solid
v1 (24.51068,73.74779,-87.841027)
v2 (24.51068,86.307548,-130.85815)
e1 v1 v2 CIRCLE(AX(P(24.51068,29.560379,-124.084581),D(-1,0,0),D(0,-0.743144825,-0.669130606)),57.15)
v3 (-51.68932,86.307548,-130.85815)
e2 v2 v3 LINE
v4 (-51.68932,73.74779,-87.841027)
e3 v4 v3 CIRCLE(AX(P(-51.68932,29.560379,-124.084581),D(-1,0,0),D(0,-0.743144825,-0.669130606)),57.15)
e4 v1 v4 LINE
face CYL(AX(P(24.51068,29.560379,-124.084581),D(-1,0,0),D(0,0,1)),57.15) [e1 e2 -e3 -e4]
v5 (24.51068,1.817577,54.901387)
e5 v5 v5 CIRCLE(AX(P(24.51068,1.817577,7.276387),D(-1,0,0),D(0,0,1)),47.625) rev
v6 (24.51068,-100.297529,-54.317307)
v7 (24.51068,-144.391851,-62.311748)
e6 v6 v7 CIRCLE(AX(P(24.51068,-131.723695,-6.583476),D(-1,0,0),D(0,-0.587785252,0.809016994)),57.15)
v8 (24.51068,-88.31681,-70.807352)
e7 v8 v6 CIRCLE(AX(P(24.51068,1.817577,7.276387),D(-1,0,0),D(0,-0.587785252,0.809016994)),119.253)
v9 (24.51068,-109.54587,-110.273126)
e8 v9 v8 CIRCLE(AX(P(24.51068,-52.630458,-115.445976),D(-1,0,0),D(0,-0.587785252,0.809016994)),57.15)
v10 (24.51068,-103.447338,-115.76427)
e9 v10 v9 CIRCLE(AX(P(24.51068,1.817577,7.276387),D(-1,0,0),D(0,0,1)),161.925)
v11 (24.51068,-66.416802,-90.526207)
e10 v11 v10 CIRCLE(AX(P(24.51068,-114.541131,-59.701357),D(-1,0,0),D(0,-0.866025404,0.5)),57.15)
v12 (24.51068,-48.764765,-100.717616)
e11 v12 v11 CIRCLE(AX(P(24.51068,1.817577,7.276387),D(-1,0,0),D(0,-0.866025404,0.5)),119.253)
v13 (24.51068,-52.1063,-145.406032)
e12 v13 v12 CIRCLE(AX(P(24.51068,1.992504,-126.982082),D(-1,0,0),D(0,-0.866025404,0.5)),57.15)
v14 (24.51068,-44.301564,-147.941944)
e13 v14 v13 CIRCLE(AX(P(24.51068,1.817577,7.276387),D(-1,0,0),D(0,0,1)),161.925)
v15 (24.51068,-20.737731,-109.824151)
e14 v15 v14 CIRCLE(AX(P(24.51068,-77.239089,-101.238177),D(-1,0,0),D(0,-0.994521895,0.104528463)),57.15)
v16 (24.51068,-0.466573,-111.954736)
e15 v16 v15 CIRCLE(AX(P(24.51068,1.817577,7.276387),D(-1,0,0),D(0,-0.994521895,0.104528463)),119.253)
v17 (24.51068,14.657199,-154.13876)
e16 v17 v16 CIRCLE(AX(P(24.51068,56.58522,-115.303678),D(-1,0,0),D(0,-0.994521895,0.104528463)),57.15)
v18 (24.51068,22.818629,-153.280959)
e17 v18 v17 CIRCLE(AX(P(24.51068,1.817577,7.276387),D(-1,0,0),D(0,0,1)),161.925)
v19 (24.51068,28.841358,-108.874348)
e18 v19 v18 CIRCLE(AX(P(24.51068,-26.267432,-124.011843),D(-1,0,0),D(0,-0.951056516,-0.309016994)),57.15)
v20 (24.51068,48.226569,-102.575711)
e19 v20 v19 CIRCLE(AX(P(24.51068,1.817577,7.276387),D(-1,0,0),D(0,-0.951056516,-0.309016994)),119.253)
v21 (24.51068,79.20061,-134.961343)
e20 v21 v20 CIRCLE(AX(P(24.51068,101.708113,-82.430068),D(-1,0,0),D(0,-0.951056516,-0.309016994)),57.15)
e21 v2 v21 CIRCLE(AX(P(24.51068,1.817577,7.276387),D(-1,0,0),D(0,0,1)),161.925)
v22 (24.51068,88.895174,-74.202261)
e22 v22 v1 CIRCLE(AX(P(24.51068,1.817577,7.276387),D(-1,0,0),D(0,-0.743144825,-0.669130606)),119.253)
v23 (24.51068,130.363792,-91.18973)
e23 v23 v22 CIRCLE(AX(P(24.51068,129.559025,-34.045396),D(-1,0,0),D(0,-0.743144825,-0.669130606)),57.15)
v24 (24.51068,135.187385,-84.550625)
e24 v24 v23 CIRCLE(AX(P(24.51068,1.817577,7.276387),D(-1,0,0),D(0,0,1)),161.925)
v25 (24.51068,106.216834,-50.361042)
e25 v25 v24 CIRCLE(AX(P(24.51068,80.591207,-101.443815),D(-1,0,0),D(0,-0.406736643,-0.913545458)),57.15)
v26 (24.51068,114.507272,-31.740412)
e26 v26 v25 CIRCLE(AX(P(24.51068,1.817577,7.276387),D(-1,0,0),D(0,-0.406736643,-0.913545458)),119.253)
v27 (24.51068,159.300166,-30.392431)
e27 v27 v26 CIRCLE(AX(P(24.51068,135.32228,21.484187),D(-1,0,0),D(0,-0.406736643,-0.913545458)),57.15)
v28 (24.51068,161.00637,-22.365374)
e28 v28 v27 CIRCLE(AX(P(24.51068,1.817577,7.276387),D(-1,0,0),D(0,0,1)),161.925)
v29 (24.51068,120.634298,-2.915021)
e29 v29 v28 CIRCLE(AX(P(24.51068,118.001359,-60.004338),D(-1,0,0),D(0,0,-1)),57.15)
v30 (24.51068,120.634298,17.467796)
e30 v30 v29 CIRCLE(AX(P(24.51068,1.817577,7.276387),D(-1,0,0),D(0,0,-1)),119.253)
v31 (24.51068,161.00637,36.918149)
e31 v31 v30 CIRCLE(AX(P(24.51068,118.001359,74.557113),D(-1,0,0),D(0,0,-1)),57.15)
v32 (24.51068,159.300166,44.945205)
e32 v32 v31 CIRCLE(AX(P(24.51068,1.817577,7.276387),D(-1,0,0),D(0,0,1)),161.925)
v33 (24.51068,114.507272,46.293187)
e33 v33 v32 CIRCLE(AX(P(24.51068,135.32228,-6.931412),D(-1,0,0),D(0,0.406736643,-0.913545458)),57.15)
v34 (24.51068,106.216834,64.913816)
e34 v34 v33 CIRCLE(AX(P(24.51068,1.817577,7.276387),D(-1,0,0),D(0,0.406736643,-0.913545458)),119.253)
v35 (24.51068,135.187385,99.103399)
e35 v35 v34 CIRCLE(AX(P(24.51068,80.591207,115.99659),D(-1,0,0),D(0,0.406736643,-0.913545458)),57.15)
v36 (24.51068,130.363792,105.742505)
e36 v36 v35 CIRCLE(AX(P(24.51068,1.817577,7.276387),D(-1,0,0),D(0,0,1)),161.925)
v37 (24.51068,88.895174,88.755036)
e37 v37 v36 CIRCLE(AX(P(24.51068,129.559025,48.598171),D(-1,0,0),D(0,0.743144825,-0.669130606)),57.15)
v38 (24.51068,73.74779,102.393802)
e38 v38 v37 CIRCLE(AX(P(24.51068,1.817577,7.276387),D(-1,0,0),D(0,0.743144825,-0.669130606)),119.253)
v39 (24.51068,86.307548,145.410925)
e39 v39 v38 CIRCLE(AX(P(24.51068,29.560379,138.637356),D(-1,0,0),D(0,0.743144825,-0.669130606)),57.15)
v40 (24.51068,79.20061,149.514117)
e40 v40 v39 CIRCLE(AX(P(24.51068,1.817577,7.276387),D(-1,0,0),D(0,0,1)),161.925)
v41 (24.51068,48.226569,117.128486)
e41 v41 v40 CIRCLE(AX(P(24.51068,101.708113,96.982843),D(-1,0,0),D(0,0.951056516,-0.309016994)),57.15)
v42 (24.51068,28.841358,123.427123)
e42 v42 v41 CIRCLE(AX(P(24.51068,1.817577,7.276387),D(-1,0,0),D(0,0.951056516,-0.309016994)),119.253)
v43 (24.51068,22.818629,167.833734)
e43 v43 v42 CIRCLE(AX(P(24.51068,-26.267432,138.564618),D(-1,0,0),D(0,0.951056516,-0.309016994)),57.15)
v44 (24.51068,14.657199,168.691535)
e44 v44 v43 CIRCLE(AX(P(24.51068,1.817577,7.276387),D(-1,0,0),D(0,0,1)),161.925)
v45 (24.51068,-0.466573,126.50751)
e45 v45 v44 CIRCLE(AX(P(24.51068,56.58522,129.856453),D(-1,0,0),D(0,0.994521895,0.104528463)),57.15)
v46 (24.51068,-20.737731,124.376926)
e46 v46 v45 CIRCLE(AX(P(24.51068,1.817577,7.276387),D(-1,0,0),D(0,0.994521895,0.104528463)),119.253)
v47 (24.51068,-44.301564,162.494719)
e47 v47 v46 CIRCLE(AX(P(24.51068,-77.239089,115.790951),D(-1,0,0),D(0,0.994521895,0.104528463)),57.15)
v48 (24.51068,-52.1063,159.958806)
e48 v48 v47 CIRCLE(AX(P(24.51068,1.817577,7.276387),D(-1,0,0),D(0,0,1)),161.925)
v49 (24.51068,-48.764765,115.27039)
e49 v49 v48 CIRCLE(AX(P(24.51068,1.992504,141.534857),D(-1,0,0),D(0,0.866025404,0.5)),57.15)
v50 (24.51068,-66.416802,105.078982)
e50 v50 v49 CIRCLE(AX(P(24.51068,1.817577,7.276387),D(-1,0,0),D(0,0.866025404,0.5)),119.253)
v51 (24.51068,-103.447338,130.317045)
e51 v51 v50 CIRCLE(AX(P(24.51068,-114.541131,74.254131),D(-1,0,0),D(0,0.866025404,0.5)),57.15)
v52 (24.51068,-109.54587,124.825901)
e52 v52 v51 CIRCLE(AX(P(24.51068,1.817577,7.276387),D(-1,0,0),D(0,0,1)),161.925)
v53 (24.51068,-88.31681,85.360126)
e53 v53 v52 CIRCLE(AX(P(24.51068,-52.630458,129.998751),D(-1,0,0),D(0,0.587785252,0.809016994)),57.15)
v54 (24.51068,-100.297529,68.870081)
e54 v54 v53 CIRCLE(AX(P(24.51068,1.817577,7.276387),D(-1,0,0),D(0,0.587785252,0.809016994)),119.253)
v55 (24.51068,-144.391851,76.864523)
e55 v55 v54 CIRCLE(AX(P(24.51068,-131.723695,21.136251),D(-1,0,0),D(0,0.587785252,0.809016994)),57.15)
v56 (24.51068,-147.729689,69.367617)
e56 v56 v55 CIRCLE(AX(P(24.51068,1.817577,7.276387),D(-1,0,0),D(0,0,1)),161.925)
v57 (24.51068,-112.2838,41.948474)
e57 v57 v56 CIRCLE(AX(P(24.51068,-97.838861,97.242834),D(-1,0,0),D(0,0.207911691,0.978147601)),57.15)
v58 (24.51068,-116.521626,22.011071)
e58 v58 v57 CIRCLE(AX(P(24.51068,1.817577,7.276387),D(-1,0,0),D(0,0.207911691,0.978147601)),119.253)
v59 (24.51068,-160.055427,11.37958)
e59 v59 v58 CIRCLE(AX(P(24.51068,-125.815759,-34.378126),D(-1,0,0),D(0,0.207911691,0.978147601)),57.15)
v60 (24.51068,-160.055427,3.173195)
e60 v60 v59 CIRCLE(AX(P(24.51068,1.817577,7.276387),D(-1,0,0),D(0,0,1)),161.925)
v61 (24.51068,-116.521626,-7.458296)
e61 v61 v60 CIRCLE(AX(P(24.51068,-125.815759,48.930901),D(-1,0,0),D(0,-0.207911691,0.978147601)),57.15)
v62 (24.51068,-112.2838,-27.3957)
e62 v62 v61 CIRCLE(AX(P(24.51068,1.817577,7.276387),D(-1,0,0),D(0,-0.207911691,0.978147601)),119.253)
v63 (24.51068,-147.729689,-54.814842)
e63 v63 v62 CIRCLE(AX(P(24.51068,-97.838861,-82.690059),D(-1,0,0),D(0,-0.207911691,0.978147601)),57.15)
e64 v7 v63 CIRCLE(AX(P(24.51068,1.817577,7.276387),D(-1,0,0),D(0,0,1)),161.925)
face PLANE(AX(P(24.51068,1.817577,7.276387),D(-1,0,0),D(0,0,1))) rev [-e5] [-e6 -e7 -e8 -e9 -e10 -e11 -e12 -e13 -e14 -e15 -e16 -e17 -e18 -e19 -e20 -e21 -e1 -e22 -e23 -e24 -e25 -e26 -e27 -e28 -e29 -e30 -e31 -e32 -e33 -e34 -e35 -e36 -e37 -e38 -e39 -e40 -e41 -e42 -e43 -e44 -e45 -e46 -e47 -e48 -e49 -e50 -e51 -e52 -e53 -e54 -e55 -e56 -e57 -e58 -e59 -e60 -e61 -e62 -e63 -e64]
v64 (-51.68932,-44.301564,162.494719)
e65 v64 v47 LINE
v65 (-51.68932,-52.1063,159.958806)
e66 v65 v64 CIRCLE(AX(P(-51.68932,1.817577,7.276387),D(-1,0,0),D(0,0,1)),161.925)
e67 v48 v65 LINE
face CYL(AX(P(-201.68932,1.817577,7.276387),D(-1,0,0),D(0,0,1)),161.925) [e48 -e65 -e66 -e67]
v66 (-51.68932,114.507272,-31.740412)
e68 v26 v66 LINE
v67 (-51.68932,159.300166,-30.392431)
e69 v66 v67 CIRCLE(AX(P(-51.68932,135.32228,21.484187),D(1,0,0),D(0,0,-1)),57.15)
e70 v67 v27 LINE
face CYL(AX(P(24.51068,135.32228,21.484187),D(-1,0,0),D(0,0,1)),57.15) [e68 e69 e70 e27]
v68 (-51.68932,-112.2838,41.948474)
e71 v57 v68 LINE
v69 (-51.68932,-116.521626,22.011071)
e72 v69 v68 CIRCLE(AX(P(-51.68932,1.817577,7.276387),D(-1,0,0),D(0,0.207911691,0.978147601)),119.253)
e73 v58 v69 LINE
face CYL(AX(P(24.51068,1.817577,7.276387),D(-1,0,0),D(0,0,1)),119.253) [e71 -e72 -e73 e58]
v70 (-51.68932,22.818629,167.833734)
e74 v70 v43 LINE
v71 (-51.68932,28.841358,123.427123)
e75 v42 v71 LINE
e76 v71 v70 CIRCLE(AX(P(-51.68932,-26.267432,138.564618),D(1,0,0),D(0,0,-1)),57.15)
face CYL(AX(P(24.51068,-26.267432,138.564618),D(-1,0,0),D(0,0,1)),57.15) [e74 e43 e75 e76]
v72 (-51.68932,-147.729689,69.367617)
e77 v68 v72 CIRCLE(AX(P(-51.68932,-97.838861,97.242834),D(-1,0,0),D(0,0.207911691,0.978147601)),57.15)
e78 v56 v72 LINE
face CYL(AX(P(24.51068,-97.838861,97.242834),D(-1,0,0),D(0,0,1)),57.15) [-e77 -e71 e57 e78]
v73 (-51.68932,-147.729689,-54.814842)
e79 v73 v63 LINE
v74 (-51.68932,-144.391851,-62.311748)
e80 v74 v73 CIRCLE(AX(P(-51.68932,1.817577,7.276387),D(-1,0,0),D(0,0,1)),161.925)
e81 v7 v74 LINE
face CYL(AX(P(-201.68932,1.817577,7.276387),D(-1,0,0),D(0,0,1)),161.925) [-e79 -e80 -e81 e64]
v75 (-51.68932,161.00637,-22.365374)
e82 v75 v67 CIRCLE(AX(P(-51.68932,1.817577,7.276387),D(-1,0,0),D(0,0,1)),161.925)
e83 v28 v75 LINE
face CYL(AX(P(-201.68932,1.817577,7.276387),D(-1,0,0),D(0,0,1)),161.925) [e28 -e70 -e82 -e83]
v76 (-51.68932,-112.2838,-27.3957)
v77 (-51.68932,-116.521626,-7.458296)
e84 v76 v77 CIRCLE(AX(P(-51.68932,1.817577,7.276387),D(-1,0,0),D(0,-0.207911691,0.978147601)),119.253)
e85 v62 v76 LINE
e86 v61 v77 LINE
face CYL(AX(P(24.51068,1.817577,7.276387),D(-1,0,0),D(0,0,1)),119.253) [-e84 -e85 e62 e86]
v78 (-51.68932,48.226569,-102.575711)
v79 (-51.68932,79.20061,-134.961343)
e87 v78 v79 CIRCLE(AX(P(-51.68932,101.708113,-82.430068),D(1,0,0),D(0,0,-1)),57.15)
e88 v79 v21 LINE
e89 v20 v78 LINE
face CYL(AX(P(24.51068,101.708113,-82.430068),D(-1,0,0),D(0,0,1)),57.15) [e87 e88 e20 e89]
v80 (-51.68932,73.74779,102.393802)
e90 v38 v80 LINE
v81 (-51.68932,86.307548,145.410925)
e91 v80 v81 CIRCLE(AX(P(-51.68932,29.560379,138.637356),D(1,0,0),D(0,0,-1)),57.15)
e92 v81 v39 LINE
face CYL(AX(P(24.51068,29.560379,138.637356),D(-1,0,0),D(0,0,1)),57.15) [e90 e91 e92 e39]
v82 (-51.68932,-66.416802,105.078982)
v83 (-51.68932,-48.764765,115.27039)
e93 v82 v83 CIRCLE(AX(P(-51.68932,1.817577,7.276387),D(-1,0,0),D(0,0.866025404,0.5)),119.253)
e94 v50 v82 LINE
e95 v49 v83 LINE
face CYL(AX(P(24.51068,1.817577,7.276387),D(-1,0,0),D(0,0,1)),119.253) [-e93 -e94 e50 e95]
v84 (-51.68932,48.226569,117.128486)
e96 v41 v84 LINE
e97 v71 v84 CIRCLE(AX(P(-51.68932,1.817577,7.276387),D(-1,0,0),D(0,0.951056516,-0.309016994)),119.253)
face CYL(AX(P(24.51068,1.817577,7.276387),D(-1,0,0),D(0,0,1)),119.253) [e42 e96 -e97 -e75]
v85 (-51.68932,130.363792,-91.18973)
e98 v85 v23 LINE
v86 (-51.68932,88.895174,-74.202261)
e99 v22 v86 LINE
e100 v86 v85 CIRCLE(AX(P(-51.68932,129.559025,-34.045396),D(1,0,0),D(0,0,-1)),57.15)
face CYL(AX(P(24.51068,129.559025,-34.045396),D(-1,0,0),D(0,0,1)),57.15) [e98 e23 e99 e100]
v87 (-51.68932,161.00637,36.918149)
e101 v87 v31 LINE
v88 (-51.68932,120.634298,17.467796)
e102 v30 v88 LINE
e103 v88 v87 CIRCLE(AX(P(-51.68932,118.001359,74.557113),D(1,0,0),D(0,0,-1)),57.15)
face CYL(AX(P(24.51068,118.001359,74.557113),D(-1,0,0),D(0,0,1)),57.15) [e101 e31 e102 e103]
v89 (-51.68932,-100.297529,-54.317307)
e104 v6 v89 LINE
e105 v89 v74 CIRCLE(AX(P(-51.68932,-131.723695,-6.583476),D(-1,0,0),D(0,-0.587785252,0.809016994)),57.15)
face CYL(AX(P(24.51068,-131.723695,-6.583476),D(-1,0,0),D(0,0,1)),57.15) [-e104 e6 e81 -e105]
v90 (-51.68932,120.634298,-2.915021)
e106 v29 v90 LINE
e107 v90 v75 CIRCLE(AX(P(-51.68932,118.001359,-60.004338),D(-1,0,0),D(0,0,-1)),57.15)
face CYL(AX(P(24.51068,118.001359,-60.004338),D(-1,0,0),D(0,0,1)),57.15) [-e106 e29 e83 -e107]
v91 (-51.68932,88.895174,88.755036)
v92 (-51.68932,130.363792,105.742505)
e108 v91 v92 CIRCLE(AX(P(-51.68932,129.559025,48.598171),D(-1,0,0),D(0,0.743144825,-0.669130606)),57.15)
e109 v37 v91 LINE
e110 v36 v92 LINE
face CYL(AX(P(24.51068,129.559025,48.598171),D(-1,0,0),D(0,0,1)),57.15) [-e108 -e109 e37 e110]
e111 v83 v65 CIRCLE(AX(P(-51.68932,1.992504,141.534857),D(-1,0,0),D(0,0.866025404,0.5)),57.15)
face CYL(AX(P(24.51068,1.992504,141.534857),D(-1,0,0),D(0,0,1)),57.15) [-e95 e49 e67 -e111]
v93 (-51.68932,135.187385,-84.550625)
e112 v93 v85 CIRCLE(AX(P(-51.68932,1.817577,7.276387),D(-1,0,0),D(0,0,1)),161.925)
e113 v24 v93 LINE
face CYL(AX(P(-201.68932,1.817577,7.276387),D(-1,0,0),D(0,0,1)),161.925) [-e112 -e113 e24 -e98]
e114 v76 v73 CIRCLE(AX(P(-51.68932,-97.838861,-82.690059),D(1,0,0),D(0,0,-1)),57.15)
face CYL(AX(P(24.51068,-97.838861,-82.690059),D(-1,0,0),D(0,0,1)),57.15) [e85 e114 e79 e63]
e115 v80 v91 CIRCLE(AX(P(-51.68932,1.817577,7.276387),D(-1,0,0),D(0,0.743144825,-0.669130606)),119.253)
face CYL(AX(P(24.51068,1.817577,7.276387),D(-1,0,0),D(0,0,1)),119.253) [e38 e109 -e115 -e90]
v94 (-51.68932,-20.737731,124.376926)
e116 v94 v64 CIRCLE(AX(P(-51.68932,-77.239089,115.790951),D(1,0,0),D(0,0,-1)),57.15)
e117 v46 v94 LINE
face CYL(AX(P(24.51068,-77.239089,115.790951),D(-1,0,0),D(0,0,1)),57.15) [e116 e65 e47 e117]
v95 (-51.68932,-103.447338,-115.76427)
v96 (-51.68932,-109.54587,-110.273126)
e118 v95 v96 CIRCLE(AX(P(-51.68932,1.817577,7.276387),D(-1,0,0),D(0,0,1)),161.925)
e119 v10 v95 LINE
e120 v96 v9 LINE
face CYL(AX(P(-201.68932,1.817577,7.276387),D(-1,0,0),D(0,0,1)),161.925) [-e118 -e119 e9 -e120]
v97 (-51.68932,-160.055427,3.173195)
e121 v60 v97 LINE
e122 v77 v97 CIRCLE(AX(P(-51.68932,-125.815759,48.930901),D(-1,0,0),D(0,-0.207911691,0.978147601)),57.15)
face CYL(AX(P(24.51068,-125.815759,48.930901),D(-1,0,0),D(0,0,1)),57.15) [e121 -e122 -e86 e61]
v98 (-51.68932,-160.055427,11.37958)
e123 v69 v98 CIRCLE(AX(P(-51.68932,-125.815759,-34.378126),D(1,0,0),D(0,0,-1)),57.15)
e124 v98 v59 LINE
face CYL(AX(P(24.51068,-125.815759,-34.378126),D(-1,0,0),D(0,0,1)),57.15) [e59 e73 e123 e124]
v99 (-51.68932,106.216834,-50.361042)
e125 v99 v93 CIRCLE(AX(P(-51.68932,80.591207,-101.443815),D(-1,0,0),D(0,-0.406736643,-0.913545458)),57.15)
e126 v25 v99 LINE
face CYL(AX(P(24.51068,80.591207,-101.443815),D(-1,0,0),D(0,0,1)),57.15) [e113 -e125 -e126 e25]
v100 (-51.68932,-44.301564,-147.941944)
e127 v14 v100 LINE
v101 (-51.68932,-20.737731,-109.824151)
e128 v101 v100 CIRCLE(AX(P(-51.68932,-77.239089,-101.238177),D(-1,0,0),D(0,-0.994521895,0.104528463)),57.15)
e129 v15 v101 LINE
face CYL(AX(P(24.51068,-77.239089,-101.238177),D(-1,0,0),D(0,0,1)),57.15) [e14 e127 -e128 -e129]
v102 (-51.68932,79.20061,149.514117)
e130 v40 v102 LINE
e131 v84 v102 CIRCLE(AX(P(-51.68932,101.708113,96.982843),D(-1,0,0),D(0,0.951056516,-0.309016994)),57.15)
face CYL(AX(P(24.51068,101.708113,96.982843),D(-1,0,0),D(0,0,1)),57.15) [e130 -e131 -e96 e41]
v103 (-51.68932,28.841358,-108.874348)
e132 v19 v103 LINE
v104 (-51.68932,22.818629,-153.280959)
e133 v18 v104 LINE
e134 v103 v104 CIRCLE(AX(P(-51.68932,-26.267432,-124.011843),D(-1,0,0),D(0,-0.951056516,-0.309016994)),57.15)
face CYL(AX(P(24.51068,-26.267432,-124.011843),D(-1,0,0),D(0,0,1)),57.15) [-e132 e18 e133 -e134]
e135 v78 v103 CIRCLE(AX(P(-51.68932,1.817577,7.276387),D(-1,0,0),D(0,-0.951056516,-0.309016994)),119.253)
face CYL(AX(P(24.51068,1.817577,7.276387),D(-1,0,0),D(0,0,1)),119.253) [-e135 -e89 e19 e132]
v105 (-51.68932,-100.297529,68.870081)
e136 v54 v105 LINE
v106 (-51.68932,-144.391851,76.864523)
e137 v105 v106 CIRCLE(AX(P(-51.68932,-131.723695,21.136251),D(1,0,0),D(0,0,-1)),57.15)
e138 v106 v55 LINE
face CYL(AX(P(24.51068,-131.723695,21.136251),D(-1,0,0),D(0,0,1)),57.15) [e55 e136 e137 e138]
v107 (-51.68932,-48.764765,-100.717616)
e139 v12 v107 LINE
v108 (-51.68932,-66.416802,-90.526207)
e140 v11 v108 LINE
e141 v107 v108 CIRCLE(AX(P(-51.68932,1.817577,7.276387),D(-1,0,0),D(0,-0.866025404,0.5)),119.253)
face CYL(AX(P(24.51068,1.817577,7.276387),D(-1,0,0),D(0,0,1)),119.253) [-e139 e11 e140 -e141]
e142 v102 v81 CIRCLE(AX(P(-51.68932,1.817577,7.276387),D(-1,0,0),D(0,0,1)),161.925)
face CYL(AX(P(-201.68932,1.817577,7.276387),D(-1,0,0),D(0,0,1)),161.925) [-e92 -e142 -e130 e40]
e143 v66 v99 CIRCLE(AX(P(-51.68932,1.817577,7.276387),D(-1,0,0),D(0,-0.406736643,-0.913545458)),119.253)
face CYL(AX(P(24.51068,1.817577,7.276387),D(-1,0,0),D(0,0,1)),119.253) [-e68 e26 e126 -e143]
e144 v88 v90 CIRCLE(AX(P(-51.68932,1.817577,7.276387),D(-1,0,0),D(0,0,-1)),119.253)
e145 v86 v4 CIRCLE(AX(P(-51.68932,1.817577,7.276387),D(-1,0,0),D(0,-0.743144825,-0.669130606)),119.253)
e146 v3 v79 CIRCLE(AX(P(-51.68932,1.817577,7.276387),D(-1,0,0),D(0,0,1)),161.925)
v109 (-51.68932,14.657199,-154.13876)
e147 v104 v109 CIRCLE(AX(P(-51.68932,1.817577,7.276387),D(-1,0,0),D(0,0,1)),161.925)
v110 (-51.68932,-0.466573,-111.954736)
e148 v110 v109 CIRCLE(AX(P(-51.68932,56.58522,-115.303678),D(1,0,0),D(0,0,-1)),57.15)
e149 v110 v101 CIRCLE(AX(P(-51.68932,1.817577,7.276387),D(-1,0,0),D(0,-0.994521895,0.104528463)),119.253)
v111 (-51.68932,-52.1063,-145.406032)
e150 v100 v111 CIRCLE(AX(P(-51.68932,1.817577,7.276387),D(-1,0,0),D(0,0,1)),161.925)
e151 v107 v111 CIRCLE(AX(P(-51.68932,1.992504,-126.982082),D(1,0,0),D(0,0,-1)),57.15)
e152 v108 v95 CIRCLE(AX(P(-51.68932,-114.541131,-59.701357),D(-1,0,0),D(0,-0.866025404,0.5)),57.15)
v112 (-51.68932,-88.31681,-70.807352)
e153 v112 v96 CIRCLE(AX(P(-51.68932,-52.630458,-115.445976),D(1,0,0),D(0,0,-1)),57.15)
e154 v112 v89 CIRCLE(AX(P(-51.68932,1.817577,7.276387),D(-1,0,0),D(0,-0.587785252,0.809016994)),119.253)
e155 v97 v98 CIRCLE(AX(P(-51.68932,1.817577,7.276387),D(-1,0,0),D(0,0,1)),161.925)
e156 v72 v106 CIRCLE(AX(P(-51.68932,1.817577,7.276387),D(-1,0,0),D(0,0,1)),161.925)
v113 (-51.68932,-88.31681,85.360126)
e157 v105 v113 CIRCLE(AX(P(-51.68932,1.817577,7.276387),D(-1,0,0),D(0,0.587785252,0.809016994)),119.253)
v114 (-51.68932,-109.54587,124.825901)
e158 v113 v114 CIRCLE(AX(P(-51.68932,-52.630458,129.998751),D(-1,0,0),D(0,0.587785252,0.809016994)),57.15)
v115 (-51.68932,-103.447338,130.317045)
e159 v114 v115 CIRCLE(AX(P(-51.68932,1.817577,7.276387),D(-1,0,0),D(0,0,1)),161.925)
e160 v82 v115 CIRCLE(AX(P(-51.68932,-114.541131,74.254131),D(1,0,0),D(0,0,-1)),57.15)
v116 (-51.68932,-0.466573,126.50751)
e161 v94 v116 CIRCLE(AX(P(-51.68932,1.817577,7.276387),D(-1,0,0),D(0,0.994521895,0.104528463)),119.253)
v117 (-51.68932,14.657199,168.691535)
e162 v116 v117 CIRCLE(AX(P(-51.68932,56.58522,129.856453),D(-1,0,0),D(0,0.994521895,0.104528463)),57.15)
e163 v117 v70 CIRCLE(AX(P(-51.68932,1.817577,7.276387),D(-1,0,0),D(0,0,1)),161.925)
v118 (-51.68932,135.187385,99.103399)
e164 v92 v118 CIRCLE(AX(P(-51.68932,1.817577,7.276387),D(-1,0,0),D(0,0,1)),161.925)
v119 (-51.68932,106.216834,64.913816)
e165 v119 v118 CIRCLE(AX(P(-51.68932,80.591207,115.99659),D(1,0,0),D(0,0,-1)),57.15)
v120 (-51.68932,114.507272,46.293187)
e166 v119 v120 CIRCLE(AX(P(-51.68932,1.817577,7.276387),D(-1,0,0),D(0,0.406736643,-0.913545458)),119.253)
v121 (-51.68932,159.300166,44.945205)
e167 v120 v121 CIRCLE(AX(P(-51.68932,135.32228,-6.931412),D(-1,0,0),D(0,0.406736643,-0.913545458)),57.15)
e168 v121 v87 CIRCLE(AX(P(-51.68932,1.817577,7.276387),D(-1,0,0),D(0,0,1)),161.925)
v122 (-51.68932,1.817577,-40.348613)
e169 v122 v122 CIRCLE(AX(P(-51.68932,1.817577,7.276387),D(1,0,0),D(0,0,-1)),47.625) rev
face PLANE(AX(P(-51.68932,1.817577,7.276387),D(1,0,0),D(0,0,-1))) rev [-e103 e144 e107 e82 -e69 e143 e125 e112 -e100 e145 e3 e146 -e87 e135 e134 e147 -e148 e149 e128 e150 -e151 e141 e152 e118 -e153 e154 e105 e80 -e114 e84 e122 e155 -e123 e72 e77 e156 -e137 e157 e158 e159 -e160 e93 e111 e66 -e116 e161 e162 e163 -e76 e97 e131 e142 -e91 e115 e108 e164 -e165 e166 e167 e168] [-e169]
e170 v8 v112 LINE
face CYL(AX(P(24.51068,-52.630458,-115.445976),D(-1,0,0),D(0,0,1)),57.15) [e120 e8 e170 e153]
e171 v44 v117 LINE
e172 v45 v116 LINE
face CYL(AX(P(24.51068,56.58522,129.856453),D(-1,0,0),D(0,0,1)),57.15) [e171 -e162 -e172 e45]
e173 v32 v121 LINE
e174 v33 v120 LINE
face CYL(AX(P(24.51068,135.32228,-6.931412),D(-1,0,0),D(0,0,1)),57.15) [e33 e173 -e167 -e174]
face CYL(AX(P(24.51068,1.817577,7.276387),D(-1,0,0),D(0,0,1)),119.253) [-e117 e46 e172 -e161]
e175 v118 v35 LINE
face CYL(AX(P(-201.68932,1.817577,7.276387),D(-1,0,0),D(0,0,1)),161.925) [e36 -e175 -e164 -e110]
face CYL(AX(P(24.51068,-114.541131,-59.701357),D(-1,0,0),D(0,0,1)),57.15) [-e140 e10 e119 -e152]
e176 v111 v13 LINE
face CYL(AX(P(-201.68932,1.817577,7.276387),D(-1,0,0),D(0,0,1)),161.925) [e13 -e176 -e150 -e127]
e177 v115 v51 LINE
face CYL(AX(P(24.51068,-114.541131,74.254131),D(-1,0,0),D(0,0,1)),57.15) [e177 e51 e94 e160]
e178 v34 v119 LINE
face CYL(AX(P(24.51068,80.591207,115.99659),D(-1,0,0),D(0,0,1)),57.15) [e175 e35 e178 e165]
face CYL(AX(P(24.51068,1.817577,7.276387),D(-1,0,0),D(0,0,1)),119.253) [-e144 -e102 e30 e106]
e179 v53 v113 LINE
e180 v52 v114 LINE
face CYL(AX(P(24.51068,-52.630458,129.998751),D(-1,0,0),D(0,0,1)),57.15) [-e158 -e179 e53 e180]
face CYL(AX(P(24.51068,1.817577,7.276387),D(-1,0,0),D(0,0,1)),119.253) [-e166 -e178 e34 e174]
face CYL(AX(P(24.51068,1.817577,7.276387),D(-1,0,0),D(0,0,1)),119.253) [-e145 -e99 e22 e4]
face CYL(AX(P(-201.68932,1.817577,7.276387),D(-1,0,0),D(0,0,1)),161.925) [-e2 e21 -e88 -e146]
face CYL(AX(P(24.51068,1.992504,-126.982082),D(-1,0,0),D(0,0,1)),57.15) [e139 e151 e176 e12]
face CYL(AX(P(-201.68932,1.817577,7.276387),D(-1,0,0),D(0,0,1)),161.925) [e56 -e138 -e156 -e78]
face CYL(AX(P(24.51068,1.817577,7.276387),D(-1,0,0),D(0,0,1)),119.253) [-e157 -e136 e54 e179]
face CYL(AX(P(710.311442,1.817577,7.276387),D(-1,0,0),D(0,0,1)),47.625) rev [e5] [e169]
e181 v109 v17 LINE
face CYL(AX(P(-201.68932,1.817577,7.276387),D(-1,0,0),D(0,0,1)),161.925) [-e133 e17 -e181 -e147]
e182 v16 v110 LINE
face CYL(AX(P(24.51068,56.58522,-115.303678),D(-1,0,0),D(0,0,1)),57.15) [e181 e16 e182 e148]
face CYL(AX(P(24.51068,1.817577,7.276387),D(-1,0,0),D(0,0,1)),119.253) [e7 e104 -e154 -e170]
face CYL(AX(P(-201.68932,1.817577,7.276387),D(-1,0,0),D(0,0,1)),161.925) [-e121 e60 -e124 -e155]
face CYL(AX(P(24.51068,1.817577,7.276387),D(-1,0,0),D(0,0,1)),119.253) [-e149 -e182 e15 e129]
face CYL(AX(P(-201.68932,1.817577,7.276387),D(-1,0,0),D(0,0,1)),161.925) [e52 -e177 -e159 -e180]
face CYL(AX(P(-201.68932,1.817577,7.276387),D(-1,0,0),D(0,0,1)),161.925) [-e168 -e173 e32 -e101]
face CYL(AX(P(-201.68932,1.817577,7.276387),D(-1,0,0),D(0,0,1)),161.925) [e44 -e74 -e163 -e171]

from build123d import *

# Parameters (mm, degrees)
SPUR_START             = -16.129320455
SPUR_GEAR_AI_OUTLINE_R = 3.175
SPUR_GEAR_AI_DEPTH     = 5.08
SCALE1_SCALE           = 15


# Read off the part's stored shape, not the designer's step: spur gear_ai
with BuildPart() as part:
    # spur gear_ai outline → spur gear_ai (new body)
    with BuildSketch(Plane.YZ.offset(SPUR_START)):
        with BuildLine():
            ThreePointArc((3.217647432, 17.980210444), (2.945962103, 18.012251215), (2.673552099, 18.037397168))
            ThreePointArc((2.673552099, 18.037397168), (1.882282705, 16.734209467), (1.665300635, 15.22512888))
            ThreePointArc((1.665300635, 15.22512888), (0.986555153, 15.183035327), (0.313890146, 15.083089914))
            ThreePointArc((0.313890146, 15.083089914), (-0.212105842, 16.514080361), (-1.257032059, 17.624276126))
            ThreePointArc((-1.257032059, 17.624276126), (-1.518261113, 17.543042448), (-1.777347815, 17.455215289))
            ThreePointArc((-1.777347815, 17.455215289), (-1.970154185, 15.942855827), (-1.554578797, 14.475987553))
            ThreePointArc((-1.554578797, 14.475987553), (-2.157522658, 14.161462519), (-2.731381258, 13.796560335))
            ThreePointArc((-2.731381258, 13.796560335), (-3.793938754, 14.889893315), (-5.200083652, 15.479097832))
            ThreePointArc((-5.200083652, 15.479097832), (-5.405687554, 15.298635745), (-5.60665251, 15.113021587))
            ThreePointArc((-5.60665251, 15.113021587), (-5.167657883, 13.652991056), (-4.191381798, 12.481969945))
            ThreePointArc((-4.191381798, 12.481969945), (-4.614269567, 11.949397667), (-4.990096395, 11.382633613))
            ThreePointArc((-4.990096395, 11.382633613), (-6.405489555, 11.949261922), (-7.929717906, 11.915596376))
            ThreePointArc((-7.929717906, 11.915596376), (-8.044145874, 11.667109416), (-8.152240417, 11.415802634))
            ThreePointArc((-8.152240417, 11.415802634), (-7.157350952, 10.260553574), (-5.789181173, 9.587859815))
            ThreePointArc((-5.789181173, 9.587859815), (-5.958891714, 8.929326879), (-6.071702896, 8.25869961))
            ThreePointArc((-6.071702896, 8.25869961), (-7.595197385, 8.200648065), (-8.973956261, 7.549933535))
            ThreePointArc((-8.973956261, 7.549933535), (-8.977422659, 7.276387354), (-8.973956261, 7.002841173))
            ThreePointArc((-8.973956261, 7.002841173), (-7.595197384, 6.352126644), (-6.071702896, 6.294075099))
            ThreePointArc((-6.071702896, 6.294075099), (-5.958891714, 5.62344783), (-5.789181173, 4.964914893))
            ThreePointArc((-5.789181173, 4.964914893), (-7.157350952, 4.292221134), (-8.152240417, 3.136972074))
            ThreePointArc((-8.152240417, 3.136972074), (-8.044145874, 2.885665292), (-7.929717906, 2.637178332))
            ThreePointArc((-7.929717906, 2.637178332), (-6.405489555, 2.603512786), (-4.990096395, 3.170141095))
            ThreePointArc((-4.990096395, 3.170141095), (-4.614269567, 2.603377042), (-4.191381798, 2.070804764))
            ThreePointArc((-4.191381798, 2.070804764), (-5.167657883, 0.899783653), (-5.60665251, -0.560246879))
            ThreePointArc((-5.60665251, -0.560246879), (-5.405687554, -0.745861037), (-5.200083652, -0.926323123))
            ThreePointArc((-5.200083652, -0.926323123), (-3.793938754, -0.337118607), (-2.731381258, 0.756214373))
            ThreePointArc((-2.731381258, 0.756214373), (-2.157522658, 0.391312189), (-1.554578797, 0.076787156))
            ThreePointArc((-1.554578797, 0.076787156), (-1.970154185, -1.390081118), (-1.777347815, -2.90244058))
            ThreePointArc((-1.777347815, -2.90244058), (-1.518261113, -2.990267739), (-1.257032059, -3.071501418))
            ThreePointArc((-1.257032059, -3.071501418), (-0.212105842, -1.961305652), (0.313890146, -0.530315206))
            ThreePointArc((0.313890146, -0.530315206), (0.986555153, -0.630260618), (1.665300635, -0.672354172))
            ThreePointArc((1.665300635, -0.672354172), (1.882282705, -2.181434759), (2.673552099, -3.48462246))
            ThreePointArc((2.673552099, -3.48462246), (2.945962103, -3.459476506), (3.217647432, -3.427435736))
            ThreePointArc((3.217647432, -3.427435736), (3.720677732, -1.988211655), (3.619162727, -0.466994991))
            ThreePointArc((3.619162727, -0.466994991), (4.27432425, -0.284702162), (4.911510093, -0.047085877))
            ThreePointArc((4.911510093, -0.047085877), (5.723531449, -1.337445034), (6.976446201, -2.206127982))
            ThreePointArc((6.976446201, -2.206127982), (7.215077342, -2.07235688), (7.450242085, -1.932581801))
            ThreePointArc((7.450242085, -1.932581801), (7.324397959, -0.413184324), (6.612924828, 0.935226378))
            ThreePointArc((6.612924828, 0.935226378), (7.137299488, 1.368237363), (7.62275047, 1.844477471))
            ThreePointArc((7.62275047, 1.844477471), (8.889405244, 0.995954565), (10.38732501, 0.711979544))
            ThreePointArc((10.38732501, 0.711979544), (10.550915796, 0.931245556), (10.708897832, 1.154586562))
            ThreePointArc((10.708897832, 1.154586562), (9.975938874, 2.491439809), (8.777527784, 3.433892087))
            ThreePointArc((8.777527784, 3.433892087), (9.080446439, 4.042749694), (9.330223676, 4.675267385))
            ThreePointArc((9.330223676, 4.675267385), (10.832495749, 4.415298049), (12.316416594, 4.765132816))
            ThreePointArc((12.316416594, 4.765132816), (12.376680691, 5.031980652), (12.430163492, 5.300269897))
            ThreePointArc((12.430163492, 5.300269897), (11.216824963, 6.223424842), (9.73869208, 6.596960136))
            ThreePointArc((9.73869208, 6.596960136), (9.767777341, 7.276387354), (9.73869208, 7.955814572))
            ThreePointArc((9.73869208, 7.955814572), (11.216824963, 8.329349866), (12.430163492, 9.252504811))
            ThreePointArc((12.430163492, 9.252504811), (12.376680691, 9.520794056), (12.316416594, 9.787641893))
            ThreePointArc((12.316416594, 9.787641893), (10.832495749, 10.137476659), (9.330223676, 9.877507324))
            ThreePointArc((9.330223676, 9.877507324), (9.080446439, 10.510025014), (8.777527784, 11.118882621))
            ThreePointArc((8.777527784, 11.118882621), (9.975938874, 12.061334899), (10.708897832, 13.398188146))
            ThreePointArc((10.708897832, 13.398188146), (10.550915796, 13.621529153), (10.38732501, 13.840795164))
            ThreePointArc((10.38732501, 13.840795164), (8.889405244, 13.556820143), (7.62275047, 12.708297238))
            ThreePointArc((7.62275047, 12.708297238), (7.137299488, 13.184537346), (6.612924828, 13.61754833))
            ThreePointArc((6.612924828, 13.61754833), (7.324397959, 14.965959032), (7.450242085, 16.485356509))
            ThreePointArc((7.450242085, 16.485356509), (7.215077342, 16.625131588), (6.976446201, 16.75890269))
            ThreePointArc((6.976446201, 16.75890269), (5.723531449, 15.890219742), (4.911510093, 14.599860585))
            ThreePointArc((4.911510093, 14.599860585), (4.27432425, 14.83747687), (3.619162727, 15.019769699))
            ThreePointArc((3.619162727, 15.019769699), (3.720677732, 16.540986364), (3.217647432, 17.980210444))
        make_face()
        with Locations((1.817577341, 7.276387354)):
            Circle(SPUR_GEAR_AI_OUTLINE_R, mode=Mode.SUBTRACT)
    extrude(amount=SPUR_GEAR_AI_DEPTH)


with BuildPart() as part_1:
    # Scale1: scaled about (-13.589320455, 1.817577341, 7.276387354)
    add(part.part.scale(SCALE1_SCALE).moved(Location((190.25048637, -25.446082774, -101.869422956))))


solid = part_1.part
